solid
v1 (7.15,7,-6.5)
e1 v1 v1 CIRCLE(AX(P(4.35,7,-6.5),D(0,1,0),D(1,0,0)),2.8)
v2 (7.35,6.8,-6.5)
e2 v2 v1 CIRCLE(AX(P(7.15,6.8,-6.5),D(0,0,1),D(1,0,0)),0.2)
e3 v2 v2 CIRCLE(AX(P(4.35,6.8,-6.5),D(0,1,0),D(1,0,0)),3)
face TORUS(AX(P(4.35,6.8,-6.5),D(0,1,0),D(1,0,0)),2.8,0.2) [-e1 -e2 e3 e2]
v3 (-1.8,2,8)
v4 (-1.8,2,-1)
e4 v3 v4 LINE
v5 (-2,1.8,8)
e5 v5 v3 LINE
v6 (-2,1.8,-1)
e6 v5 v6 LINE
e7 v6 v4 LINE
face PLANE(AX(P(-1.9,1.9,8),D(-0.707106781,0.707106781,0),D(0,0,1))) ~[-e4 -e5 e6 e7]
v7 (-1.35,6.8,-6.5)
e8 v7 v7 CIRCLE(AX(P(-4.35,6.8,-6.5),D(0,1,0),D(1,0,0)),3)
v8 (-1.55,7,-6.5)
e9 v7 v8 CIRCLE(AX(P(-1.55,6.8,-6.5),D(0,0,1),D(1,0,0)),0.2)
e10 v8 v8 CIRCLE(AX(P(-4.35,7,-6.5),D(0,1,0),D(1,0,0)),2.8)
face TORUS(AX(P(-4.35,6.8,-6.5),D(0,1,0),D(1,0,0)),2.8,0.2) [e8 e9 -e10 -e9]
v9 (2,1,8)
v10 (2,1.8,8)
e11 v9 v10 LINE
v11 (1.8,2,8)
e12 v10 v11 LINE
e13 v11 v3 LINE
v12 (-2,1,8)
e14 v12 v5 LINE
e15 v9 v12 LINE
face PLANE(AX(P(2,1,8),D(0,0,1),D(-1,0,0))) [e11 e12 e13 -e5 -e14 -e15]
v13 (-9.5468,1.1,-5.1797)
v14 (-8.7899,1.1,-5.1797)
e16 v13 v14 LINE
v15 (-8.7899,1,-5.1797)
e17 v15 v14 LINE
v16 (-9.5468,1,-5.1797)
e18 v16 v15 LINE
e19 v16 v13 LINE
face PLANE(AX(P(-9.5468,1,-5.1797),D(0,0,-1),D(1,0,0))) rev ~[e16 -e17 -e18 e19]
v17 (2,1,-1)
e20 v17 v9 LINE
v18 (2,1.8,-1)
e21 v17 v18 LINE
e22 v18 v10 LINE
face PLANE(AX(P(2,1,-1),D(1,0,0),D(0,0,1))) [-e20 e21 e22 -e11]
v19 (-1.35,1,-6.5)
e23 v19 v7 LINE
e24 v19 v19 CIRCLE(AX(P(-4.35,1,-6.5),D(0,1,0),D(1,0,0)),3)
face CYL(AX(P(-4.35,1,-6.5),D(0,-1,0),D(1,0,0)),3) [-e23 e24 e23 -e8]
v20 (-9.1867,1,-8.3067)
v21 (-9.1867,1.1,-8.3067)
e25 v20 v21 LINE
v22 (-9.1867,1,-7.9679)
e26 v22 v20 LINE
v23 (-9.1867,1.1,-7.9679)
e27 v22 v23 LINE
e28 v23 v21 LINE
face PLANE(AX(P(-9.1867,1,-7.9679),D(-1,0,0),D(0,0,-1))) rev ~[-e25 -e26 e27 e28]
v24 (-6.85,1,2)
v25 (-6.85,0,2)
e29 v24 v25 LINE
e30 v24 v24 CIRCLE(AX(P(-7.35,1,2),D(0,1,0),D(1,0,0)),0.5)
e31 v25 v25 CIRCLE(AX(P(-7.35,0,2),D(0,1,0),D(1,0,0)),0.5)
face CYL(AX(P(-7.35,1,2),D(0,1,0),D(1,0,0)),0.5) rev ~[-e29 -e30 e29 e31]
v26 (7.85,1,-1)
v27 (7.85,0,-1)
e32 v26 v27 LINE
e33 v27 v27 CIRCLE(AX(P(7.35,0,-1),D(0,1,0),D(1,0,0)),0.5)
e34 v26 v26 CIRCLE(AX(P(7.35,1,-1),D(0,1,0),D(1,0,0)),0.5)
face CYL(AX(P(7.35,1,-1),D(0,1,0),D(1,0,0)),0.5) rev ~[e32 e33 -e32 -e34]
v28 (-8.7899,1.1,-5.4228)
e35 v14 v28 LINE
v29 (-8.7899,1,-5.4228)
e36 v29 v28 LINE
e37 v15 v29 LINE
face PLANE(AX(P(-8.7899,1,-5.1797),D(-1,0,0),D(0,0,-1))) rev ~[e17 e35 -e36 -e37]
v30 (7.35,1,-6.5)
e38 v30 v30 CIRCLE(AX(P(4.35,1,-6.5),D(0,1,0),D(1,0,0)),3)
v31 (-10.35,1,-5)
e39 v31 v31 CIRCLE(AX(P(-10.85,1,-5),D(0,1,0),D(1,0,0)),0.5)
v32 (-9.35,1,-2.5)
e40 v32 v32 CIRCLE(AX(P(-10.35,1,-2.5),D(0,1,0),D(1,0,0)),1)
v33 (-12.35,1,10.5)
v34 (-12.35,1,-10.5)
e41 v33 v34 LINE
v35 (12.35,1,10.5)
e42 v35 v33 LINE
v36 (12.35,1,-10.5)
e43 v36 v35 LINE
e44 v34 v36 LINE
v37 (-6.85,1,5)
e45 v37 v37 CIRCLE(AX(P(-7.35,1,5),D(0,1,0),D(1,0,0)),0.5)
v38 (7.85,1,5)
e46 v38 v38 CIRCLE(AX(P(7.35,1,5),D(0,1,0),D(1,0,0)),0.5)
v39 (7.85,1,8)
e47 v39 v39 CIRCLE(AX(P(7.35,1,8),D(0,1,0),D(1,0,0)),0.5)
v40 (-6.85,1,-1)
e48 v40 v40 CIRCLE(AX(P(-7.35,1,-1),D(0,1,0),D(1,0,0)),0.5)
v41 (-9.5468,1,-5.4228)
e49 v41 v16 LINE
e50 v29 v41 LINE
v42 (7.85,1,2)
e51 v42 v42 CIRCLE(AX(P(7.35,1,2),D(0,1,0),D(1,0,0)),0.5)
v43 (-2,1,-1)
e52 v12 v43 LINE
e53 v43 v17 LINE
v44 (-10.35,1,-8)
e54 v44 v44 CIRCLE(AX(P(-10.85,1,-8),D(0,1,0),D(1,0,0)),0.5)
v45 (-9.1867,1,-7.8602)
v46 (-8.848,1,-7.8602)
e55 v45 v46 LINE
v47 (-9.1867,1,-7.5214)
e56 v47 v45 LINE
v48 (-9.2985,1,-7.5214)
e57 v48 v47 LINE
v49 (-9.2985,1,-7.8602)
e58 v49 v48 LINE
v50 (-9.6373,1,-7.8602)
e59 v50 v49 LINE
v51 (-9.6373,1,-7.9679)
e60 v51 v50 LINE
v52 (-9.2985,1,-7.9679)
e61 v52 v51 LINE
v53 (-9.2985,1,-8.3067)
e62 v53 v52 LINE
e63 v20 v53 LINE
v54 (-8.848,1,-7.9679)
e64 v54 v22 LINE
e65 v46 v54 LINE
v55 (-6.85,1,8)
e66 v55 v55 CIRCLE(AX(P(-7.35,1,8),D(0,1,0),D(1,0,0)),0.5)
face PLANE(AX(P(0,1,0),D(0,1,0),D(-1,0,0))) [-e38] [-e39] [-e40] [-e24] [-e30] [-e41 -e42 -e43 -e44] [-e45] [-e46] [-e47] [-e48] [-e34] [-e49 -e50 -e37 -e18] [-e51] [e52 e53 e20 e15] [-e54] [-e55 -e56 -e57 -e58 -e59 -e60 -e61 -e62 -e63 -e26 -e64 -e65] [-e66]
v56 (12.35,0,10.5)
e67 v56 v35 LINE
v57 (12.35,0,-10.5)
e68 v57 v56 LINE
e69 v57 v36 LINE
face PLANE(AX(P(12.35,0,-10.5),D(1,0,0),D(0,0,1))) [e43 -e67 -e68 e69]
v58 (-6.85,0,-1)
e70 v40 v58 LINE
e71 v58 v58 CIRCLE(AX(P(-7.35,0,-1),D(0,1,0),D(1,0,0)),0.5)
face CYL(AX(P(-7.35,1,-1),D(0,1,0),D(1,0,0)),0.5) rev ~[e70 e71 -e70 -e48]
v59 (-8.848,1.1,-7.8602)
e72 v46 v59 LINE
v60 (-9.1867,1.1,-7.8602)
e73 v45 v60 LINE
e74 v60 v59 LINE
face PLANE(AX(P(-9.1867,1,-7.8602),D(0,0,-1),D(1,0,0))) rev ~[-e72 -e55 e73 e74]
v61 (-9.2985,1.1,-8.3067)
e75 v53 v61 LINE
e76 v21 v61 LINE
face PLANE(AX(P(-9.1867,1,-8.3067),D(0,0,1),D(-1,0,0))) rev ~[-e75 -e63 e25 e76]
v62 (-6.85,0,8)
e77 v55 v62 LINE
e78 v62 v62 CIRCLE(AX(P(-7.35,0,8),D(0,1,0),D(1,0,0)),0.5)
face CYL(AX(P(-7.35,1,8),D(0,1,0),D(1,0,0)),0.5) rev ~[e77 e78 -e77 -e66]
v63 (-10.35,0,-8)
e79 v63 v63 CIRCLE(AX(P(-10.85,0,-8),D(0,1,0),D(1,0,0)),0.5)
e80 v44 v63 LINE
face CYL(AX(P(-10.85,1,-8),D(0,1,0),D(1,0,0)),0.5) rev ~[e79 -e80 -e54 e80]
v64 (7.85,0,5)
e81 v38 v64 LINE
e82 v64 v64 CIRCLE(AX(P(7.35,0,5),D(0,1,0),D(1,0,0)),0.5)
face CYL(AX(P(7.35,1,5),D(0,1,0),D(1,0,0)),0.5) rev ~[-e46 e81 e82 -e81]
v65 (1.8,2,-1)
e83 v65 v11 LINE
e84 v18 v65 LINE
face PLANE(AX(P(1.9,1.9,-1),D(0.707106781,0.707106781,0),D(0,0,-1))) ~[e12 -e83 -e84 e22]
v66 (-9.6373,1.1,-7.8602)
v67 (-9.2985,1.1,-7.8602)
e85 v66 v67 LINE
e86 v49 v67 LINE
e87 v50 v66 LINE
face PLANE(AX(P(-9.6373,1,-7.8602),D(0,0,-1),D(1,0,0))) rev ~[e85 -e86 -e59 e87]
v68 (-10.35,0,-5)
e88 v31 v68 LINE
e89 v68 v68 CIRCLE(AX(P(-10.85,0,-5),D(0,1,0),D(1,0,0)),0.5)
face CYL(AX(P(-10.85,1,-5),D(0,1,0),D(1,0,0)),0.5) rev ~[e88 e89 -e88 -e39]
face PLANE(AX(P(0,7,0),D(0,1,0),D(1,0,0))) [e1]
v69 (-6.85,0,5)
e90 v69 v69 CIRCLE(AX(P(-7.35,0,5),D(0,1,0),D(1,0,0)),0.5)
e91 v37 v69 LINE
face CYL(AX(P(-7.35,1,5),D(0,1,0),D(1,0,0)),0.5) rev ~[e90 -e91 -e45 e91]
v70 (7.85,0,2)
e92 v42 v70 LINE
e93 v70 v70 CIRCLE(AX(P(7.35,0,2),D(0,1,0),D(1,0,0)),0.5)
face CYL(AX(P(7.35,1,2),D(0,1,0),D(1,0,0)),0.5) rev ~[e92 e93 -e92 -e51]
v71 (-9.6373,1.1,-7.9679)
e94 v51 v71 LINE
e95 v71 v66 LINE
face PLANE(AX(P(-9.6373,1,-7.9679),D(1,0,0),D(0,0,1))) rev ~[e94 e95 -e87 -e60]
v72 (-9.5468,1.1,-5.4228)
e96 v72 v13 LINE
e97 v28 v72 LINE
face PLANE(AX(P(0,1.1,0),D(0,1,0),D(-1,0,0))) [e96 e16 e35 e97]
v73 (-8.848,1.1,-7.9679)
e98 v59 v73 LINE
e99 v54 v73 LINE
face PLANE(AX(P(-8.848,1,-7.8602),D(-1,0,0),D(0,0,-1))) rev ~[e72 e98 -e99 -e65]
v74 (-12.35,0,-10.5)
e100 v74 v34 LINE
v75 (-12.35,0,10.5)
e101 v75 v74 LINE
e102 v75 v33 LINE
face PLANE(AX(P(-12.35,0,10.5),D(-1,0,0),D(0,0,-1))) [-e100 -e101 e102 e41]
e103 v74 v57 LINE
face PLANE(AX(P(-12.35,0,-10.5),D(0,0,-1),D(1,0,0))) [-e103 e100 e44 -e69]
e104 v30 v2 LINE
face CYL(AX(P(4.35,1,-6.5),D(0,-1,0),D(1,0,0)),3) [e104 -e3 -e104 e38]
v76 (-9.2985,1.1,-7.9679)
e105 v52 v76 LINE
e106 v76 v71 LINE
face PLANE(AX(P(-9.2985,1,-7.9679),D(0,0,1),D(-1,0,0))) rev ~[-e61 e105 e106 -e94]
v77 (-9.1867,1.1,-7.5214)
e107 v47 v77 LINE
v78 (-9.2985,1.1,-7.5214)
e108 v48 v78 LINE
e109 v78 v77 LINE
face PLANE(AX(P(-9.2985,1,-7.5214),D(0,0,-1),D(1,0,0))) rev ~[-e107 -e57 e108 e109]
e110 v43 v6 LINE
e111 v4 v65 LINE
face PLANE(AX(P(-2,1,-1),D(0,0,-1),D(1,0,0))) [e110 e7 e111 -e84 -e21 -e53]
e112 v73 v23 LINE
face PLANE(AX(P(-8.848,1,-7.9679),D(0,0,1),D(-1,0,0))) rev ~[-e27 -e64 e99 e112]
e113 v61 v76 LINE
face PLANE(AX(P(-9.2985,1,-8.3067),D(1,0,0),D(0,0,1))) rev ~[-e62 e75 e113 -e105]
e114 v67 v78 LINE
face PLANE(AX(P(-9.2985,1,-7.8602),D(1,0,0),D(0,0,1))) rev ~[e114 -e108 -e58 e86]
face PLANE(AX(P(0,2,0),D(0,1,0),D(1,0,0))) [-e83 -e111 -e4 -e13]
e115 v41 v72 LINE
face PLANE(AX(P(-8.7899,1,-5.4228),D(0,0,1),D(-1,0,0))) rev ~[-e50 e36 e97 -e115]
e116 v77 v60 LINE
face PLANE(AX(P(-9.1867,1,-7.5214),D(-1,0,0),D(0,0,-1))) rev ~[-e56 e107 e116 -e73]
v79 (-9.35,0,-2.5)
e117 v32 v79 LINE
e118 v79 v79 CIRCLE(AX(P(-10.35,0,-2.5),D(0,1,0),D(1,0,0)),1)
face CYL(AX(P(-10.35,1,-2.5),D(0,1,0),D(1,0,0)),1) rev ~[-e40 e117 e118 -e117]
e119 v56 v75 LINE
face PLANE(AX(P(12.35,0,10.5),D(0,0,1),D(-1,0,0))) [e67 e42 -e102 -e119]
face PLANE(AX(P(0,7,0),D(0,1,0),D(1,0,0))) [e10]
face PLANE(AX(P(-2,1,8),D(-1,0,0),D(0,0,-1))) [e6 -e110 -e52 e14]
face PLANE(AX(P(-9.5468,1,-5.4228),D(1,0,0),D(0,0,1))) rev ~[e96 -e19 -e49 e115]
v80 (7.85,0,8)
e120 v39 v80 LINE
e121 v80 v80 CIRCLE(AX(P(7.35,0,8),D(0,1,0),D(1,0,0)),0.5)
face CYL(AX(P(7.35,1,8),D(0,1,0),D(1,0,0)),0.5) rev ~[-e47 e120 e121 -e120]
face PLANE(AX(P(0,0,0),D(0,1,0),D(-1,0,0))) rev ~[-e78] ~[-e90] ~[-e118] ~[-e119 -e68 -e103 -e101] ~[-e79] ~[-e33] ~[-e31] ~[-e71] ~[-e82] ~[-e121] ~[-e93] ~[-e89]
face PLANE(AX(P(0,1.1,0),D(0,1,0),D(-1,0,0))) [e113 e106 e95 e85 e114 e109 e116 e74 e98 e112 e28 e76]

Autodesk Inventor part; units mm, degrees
ref_plane "YZ Plane" through (0, 0, 0) normal (1, 0, 0) x (0, 1, 0)
ref_plane "XZ Plane" through (0, 0, 0) normal (0, 1, 0) x (-1, 0, 0)
ref_plane "XY Plane" through (0, 0, 0) normal (0, 0, 1) x (1, 0, 0)
sketch "Sketch1" plane through (0, 0, 0) normal (0, 1, 0) x (-1, 0, 0)
  line L0 (-12.35, 10.5) -> (12.35, 10.5)
  line L1 (12.35, 10.5) -> (12.35, -10.5)
  line L2 (12.35, -10.5) -> (-12.35, -10.5)
  line L3 (-12.35, -10.5) -> (-12.35, 10.5)
  line L4 (-12.35, 10.5) -> (12.35, -10.5) construction
  line L5 (12.35, 10.5) -> (-12.35, -10.5) construction
  point P0 (0, 0)
  dimension "d0" = 21
  dimension "d1" = 24.7
extrude "Extrusion1" add sketch "Sketch1" along normal blind 1
sketch "Sketch2" plane through (0, 1, 0) normal (0, 1, 0) x (1, 0, 0)
  circle A0 centre (-10.35, 2.5) radius 1
  line L0 (12.35, 10.5) -> (-12.35, 10.5) projected
  line L1 (-12.35, 10.5) -> (-12.35, -10.5) projected
  point P0 (0, 0)
  dimension "d4" = 2
  dimension "d5" = 8
  dimension "d6" = 2
extrude "Extrusion2" cut sketch "Sketch2" against normal blind 1
sketch "Sketch3" plane through (0, 1, 0) normal (0, 1, 0) x (1, 0, 0)
  circle A0 centre (-4.35, 6.5) radius 3
  line L0 (-12.35, 10.5) -> (-12.35, -10.5) projected
  line L1 (12.35, 10.5) -> (-12.35, 10.5) projected
  line L2 (0, 0) -> (0, 10.5) construction
  circle A1 centre (4.35, 6.5) radius 3
  dimension "d9" = 6
  dimension "d10" = 8
  dimension "d11" = 4
extrude "Extrusion3" add sketch "Sketch3" along normal blind 6
fillet "Fillet1" radius 0.2 2 edges at (-7.35, 7, -6.5) (1.35, 7, -6.5)
sketch "Sketch4" plane through (0, 1, 0) normal (0, 1, 0) x (1, 0, 0)
  circle A0 centre (-7.35, 1) radius 0.5
  circle A1 centre (-7.35, -2) radius 0.5
  circle A2 centre (-10.35, 2.5) radius 1 projected
  line L0 (-10.35, 1.5) -> (-7.35, 1.5) construction
  circle A3 centre (-7.35, -5) radius 0.5
  circle A4 centre (-7.35, -8) radius 0.5
  circle A5 centre (-4.35, 6.5) radius 3 projected
  line L1 (-7.35, 6.5) -> (-7.35, 1.5) construction
  line L2 (0, 0) -> (0, -10.5851) construction
  circle A6 centre (7.35, 1) radius 0.5
  circle A7 centre (7.35, -2) radius 0.5
  circle A8 centre (7.35, -5) radius 0.5
  circle A9 centre (7.35, -8) radius 0.5
  dimension "d15" = 1
  dimension "d16" = 1
  dimension "d17" = 1
  dimension "d18" = 1
  dimension "d19" = 3
  dimension "d20" = 3
  dimension "d21" = 3
extrude "Extrusion4" cut sketch "Sketch4" against normal blind 1 contours A0 | A1 | A3 | A4 | A6 | A7 | A8 | A9
sketch "Sketch5" plane through (0, 1, 0) normal (0, 1, 0) x (1, 0, 0)
  line L0 (-2, 1) -> (2, 1)
  line L1 (2, 1) -> (2, -8)
  line L2 (2, -8) -> (-2, -8)
  line L3 (-2, -8) -> (-2, 1)
  circle A0 centre (-7.35, 1) radius 0.5 projected
  point P0 (0, 0)
  point P1 (0, 1)
  dimension "d26" = 4
  dimension "d27" = 9
extrude "Extrusion5" add sketch "Sketch5" along normal blind 1 contours L0 L1 L2 L3
chamfer "Chamfer1" distance 0.2 angle 45 2 edges at (2, 2, 3.5) (-2, 2, 3.5)
sketch "Sketch6" plane through (0, 1, 0) normal (0, 1, 0) x (1, 0, 0)
  circle A0 centre (-10.85, 8) radius 0.5
  circle A1 centre (-10.85, 5) radius 0.5
  line L0 (12.35, 10.5) -> (-12.35, 10.5) projected
  line L1 (-12.35, 10.5) -> (-12.35, -10.5) projected
  point P0 (0, 0)
  dimension "d33" = 1
  dimension "d34" = 1
  dimension "d35" = 2.5
  dimension "d36" = 1.5
  dimension "d37" = 3
extrude "Extrusion6" cut sketch "Sketch6" against normal blind 1
sketch "Sketch7" plane through (0, 1, 0) normal (0, 1, 0) x (1, 0, 0)
  line L0 (-9.7434, 8.3067) -> (-6.693, 8.3067) construction
  line L1 (-6.693, 8.3067) -> (-6.693, 5.9132) construction
  line L2 (-6.693, 5.9132) -> (-9.7434, 5.9132) construction
  line L3 (-9.7434, 5.9132) -> (-9.7434, 8.3067) construction
  line L4 (-9.6683, 5.4228) -> (-8.67, 5.4228) construction
  line L5 (-8.67, 5.4228) -> (-8.67, 5.1797) construction
  line L6 (-8.67, 5.1797) -> (-9.6683, 5.1797) construction
  line L7 (-9.6683, 5.1797) -> (-9.6683, 5.4228) construction
  line L8 (-8.848, 7.8602) -> (-9.1867, 7.8602)
  line L9 (-9.1867, 7.8602) -> (-9.1867, 7.5214)
  line L10 (-9.1867, 7.5214) -> (-9.2985, 7.5214)
  line L11 (-9.2985, 7.5214) -> (-9.2985, 7.8602)
  line L12 (-9.2985, 7.8602) -> (-9.6373, 7.8602)
  line L13 (-9.6373, 7.8602) -> (-9.6373, 7.9679)
  line L14 (-9.6373, 7.9679) -> (-9.2985, 7.9679)
  line L15 (-9.2985, 7.9679) -> (-9.2985, 8.3067)
  line L16 (-9.2985, 8.3067) -> (-9.1867, 8.3067)
  line L17 (-9.1867, 8.3067) -> (-9.1867, 7.9679)
  line L18 (-9.1867, 7.9679) -> (-8.848, 7.9679)
  line L19 (-8.848, 7.9679) -> (-8.848, 7.8602)
  line L20 (-8.7899, 5.1797) -> (-9.5468, 5.1797)
  line L21 (-9.5468, 5.1797) -> (-9.5468, 5.4228)
  line L22 (-9.5468, 5.4228) -> (-8.7899, 5.4228)
  line L23 (-8.7899, 5.4228) -> (-8.7899, 5.1797)
  point P0 (0, 0)
emboss "Emboss1" sketch "Sketch7" operation add depth 0.1 direction (0, -1, 0)
properties part number "L298N_CPY"
